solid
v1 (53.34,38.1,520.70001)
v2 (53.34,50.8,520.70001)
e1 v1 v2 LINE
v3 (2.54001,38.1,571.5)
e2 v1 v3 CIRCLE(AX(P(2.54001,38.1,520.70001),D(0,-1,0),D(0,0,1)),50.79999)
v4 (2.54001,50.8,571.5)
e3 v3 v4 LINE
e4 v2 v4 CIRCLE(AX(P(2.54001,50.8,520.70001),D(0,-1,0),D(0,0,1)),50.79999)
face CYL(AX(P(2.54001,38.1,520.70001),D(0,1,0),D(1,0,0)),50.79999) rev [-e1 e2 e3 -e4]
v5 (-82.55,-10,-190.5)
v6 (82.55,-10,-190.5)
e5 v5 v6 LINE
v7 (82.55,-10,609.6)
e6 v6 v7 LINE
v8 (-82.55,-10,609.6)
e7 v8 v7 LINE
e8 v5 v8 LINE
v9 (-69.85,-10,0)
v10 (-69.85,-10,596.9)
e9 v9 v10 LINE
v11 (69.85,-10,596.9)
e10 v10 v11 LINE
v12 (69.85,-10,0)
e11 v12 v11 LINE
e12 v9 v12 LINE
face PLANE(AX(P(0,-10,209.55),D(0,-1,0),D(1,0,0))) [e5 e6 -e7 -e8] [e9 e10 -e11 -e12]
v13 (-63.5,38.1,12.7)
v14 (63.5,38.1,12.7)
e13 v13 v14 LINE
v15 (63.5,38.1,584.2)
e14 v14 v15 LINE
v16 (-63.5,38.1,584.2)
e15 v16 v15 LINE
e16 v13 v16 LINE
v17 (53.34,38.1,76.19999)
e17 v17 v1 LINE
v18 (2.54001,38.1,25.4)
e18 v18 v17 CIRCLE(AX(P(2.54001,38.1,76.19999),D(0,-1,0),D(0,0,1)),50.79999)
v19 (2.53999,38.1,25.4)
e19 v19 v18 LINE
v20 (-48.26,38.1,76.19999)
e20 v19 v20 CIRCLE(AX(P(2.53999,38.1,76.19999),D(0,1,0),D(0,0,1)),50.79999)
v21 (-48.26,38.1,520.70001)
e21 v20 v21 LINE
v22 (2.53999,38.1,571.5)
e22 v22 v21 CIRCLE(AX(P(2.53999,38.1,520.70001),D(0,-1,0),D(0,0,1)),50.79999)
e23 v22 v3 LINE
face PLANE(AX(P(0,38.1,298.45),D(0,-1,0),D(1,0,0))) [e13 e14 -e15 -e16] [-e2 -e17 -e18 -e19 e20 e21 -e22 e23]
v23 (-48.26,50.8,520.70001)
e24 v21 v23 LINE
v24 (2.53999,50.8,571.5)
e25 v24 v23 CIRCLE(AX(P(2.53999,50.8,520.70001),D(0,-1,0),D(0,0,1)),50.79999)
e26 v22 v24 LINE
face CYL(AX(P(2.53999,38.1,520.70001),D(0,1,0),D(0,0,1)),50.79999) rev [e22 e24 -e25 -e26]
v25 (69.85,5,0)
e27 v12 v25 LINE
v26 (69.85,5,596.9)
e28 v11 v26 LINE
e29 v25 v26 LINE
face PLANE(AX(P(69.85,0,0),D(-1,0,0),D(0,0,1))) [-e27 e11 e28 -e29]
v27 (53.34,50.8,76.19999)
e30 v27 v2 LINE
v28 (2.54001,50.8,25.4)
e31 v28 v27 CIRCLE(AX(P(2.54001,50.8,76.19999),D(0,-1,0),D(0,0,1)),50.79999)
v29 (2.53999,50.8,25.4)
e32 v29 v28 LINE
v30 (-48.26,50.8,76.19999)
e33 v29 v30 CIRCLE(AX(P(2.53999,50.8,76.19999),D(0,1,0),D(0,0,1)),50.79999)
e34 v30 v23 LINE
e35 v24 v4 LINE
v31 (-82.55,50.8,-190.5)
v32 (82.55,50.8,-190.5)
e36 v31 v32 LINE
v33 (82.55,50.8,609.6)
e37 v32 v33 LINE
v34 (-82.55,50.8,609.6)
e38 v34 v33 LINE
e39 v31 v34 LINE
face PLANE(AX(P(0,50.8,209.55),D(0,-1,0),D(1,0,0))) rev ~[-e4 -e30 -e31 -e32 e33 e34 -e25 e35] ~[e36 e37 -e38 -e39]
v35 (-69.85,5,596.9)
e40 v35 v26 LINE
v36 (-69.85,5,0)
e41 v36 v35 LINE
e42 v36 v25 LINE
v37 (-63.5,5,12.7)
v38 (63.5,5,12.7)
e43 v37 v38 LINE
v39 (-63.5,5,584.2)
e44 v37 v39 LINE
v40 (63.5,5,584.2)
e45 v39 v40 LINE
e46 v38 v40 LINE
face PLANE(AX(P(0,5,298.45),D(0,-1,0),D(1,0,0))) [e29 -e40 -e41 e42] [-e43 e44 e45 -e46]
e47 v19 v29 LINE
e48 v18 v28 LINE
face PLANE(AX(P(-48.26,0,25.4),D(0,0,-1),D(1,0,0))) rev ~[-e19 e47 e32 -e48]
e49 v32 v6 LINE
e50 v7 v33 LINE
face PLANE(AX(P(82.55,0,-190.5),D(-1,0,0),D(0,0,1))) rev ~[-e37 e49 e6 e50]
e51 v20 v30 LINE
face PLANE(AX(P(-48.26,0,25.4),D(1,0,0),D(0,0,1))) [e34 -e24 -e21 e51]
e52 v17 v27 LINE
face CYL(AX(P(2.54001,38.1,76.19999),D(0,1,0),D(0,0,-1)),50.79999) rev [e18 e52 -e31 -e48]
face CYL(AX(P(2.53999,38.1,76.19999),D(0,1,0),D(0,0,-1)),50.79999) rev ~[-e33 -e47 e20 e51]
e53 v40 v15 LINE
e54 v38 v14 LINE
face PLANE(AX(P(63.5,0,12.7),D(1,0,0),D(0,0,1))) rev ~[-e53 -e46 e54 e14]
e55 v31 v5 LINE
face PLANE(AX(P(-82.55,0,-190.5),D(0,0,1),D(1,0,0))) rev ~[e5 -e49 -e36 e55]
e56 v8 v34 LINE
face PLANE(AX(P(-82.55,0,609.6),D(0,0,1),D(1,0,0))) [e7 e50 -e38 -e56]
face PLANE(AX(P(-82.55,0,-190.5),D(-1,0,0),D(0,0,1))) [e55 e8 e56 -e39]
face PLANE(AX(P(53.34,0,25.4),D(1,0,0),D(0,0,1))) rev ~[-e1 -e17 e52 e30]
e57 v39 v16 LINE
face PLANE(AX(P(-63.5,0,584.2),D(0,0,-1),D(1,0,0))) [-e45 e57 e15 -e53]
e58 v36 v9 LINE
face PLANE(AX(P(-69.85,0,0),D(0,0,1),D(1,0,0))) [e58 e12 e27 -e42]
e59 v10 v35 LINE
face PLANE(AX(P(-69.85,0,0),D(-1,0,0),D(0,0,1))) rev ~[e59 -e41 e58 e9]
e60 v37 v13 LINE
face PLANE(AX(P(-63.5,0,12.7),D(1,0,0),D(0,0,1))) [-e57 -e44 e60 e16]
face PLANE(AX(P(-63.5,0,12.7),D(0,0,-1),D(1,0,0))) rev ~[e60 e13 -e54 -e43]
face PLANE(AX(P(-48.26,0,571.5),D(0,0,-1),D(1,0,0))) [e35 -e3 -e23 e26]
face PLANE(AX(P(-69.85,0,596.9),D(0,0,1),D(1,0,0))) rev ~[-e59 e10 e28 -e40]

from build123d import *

# Parameters (mm, degrees)
F0_W        = 165.1
F0_H        = 800.1
F0_W_2      = 139.7
F0_H_2      = 596.9
F0_W_3      = 127
F0_H_3      = 571.5
F0_W_4      = 101.6
F0_H_4      = 546.1
F1_DEPTH    = 50.8
F2_DEPTH    = 5
F3_DEPTH    = 38.1
F4_R        = 50.79999
F2_FACE_W   = 165.1
F2_FACE_H   = 800.1
F2_FACE_W_2 = 139.7
F2_FACE_H_2 = 596.9
F5_DEPTH    = 10


# Not quite as in the source:
# - a fillet or chamfer is up to 0.001 mm smaller than in the source, because OpenCascade refuses the exact size
# - a feature names something its author has since deleted; it is built from what else it names


with BuildPart() as f1:
    # F0 (on Front) → F1 (new body)
    with BuildSketch(Plane.XZ):
        with Locations((0, 209.55)):
            Rectangle(F0_W, F0_H)
        with Locations((0, 298.45)):
            Rectangle(F0_W_2, F0_H_2, mode=Mode.SUBTRACT)
        with Locations((0, 298.45)):
            Rectangle(F0_W_2, F0_H_2)
        with Locations((0, 298.45)):
            Rectangle(F0_W_3, F0_H_3, mode=Mode.SUBTRACT)
        with Locations((0, 298.45)):
            Rectangle(F0_W_3, F0_H_3)
        with Locations((2.54, 298.45)):
            Rectangle(F0_W_4, F0_H_4, mode=Mode.SUBTRACT)
    extrude(amount=-F1_DEPTH)

    # F0 (on Front) → F2 (cut)
    with BuildSketch(Plane.XZ):
        with Locations((0, 298.45)):
            Rectangle(F0_W_2, F0_H_2)
        with Locations((0, 298.45)):
            Rectangle(F0_W_3, F0_H_3, mode=Mode.SUBTRACT)
    extrude(amount=-F2_DEPTH, mode=Mode.SUBTRACT)

    # F0 (on Front) → F3 (cut)
    with BuildSketch(Plane.XZ):
        with Locations((0, 298.45)):
            Rectangle(F0_W_3, F0_H_3)
        with Locations((2.54, 298.45)):
            Rectangle(F0_W_4, F0_H_4, mode=Mode.SUBTRACT)
    extrude(amount=-F3_DEPTH, mode=Mode.SUBTRACT)

    # F4 (radius 50.8 in the source; OpenCascade refuses exactly that, so slightly less here)
    f4_edges = [f1.edges().sort_by_distance(p)[0] for p in [
        (53.34, 44.45, 571.5),
        (-48.26, 44.45, 571.5),
        (-48.26, 44.45, 25.4),
        (53.34, 44.45, 25.4),
    ]]
    fillet(f4_edges, radius=F4_R)

    # F0 (on Front) + F2_face (on face) → F5 (join)
    with BuildSketch(Plane.XZ):
        with Locations((0, 209.55)):
            Rectangle(F0_W, F0_H)
        with Locations((0, 298.45)):
            Rectangle(F0_W_2, F0_H_2, mode=Mode.SUBTRACT)
    with BuildSketch(Plane(origin=(0, 0, 57.3602649007), x_dir=(1, 0, 0), z_dir=(0, -1, 0))):
        with Locations((0, 152.1897350993)):
            Rectangle(F2_FACE_W, F2_FACE_H)
        with Locations((0, 241.0897350993)):
            Rectangle(F2_FACE_W_2, F2_FACE_H_2, mode=Mode.SUBTRACT)
    extrude(amount=F5_DEPTH)


solid = f1.part
